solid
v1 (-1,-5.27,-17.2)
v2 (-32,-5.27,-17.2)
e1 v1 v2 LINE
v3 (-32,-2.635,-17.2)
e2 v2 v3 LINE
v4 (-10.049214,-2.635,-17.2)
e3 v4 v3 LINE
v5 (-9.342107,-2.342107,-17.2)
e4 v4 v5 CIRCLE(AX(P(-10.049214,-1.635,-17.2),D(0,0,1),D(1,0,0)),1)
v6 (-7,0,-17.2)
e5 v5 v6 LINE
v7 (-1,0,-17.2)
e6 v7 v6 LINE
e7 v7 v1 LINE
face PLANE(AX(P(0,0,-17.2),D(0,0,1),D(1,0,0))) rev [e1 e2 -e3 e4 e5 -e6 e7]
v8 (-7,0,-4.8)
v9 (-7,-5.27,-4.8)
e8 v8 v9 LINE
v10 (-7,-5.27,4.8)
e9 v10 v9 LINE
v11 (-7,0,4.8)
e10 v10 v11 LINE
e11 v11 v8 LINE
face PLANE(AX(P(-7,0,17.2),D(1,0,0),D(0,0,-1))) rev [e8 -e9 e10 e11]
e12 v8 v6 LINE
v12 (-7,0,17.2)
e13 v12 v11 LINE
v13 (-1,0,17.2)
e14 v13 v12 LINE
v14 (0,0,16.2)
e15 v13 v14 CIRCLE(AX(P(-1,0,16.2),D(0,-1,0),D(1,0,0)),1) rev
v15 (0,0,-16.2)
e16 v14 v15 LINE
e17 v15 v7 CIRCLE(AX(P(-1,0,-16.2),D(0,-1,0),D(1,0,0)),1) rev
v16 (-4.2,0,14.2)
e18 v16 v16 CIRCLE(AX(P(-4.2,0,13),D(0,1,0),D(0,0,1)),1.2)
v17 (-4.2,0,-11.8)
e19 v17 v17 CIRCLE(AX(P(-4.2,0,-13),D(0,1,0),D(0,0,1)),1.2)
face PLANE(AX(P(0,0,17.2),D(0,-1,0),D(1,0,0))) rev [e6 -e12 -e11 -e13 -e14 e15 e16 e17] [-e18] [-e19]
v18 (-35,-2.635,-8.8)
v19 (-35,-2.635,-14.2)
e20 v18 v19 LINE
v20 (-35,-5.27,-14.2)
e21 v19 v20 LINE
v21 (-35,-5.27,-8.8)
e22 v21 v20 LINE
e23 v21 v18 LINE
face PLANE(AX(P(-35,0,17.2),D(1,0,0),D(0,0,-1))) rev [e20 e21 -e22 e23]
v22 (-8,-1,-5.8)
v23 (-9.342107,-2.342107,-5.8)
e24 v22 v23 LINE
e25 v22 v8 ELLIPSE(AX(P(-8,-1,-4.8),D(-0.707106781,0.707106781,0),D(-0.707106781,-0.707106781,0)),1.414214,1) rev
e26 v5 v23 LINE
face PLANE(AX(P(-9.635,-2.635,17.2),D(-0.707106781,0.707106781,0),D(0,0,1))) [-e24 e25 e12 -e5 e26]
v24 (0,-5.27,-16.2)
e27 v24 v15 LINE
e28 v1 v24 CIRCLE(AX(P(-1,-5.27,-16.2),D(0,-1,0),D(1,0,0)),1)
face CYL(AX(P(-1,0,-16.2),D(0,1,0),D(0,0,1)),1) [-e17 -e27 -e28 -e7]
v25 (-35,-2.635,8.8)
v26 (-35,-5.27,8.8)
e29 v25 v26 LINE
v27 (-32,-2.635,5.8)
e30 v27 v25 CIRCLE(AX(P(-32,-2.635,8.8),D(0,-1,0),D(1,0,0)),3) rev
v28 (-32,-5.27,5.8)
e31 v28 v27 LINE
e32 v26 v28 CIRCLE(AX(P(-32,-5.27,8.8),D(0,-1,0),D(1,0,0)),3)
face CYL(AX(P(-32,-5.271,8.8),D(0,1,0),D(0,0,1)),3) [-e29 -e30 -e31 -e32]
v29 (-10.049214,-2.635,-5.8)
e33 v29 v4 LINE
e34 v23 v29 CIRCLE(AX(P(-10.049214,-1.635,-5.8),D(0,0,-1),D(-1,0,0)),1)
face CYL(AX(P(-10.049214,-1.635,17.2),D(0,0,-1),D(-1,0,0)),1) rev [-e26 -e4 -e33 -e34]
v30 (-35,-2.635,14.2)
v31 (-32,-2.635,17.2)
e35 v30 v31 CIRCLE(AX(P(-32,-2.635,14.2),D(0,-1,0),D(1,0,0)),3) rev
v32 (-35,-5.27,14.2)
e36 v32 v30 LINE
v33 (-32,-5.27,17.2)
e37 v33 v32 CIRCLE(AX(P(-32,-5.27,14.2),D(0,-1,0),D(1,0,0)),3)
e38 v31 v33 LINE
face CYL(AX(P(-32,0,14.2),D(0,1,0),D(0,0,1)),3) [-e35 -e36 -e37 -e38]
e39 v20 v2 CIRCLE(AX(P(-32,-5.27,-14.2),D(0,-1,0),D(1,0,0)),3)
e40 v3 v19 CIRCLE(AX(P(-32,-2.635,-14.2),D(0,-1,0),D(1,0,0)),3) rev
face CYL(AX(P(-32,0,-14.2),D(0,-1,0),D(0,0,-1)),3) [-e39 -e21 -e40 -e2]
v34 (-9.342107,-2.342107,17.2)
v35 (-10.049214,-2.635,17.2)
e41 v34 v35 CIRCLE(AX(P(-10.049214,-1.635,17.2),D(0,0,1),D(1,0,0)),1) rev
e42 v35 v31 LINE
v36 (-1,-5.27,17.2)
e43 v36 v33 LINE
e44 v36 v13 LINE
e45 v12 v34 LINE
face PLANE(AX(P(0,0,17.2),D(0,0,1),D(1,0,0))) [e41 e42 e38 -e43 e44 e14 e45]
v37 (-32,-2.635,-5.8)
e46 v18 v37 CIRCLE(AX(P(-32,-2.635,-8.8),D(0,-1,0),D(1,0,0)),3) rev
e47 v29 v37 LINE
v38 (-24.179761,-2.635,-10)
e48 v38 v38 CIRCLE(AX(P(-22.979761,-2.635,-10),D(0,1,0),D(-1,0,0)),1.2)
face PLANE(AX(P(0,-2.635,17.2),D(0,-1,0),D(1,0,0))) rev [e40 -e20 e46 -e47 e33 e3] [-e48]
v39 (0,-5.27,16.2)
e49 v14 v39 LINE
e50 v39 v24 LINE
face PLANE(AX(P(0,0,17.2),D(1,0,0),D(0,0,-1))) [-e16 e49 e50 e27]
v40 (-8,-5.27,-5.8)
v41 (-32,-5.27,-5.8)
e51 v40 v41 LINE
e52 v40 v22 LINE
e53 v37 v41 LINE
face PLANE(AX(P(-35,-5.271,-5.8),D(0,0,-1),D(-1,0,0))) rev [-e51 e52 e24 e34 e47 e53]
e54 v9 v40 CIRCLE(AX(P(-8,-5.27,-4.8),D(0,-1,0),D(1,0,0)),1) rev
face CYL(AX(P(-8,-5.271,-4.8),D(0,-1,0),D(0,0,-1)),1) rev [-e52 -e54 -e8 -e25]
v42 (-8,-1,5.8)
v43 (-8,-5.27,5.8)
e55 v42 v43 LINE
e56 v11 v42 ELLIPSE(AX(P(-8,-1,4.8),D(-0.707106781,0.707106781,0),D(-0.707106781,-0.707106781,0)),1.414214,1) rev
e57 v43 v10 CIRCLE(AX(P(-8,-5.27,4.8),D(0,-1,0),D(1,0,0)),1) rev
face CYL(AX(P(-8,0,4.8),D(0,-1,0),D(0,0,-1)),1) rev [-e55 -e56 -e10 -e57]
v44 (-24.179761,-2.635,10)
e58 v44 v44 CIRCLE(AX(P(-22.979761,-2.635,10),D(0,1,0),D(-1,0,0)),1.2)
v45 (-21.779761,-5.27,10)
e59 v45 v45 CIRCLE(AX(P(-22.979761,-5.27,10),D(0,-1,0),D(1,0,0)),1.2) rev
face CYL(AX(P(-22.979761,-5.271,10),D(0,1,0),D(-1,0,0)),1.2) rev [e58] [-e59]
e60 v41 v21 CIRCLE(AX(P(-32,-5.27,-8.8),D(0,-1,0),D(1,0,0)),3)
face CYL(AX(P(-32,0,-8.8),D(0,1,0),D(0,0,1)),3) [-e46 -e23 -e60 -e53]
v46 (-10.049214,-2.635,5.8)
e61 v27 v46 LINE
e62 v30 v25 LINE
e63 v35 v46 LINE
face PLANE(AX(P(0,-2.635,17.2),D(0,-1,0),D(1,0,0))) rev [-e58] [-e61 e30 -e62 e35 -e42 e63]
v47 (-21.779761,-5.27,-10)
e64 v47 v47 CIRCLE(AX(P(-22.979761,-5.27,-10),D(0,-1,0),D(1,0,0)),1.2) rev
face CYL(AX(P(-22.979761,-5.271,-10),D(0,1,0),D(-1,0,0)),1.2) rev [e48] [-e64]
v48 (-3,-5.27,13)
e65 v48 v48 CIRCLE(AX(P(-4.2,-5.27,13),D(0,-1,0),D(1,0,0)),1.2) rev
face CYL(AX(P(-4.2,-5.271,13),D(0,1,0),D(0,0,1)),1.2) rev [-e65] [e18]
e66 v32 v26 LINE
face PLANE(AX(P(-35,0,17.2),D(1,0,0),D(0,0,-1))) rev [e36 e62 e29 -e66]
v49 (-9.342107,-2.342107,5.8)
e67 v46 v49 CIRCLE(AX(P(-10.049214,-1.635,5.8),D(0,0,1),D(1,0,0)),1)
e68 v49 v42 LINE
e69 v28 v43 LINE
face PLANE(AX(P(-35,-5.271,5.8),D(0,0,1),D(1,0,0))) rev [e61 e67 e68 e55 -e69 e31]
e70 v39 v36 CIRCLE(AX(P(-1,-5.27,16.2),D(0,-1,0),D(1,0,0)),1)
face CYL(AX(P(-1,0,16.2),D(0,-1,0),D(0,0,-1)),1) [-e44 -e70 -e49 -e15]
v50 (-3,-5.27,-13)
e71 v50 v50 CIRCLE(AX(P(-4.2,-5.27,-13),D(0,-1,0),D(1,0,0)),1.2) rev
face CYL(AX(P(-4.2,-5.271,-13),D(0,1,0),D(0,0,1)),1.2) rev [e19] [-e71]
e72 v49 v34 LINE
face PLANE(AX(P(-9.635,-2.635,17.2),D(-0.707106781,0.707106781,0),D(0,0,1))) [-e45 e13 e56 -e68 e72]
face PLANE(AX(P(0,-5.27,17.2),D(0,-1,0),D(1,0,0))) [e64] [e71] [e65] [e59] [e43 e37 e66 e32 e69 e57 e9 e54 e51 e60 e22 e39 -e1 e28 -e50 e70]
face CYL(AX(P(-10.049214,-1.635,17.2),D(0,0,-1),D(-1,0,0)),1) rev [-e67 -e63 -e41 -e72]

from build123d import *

# Parameters (mm, degrees)
SKETCH1_W           = 7
SKETCH1_H           = 2.635
BOSS_EXTRUDE1_DEPTH = 17.2
CUT_EXTRUDE1_REACH  = 41.352
SKETCH2_R           = 1.2
CUT_EXTRUDE2_REACH  = 41.087
SKETCH3_R           = 1.2
SKETCH3_W           = 28
SKETCH3_H           = 11.6
CHAMFER1_SIZE       = 2.635
FILLET2_R           = 1
FILLET3_R           = 3
FILLET4_R           = 1


with BuildPart() as part:
    # Sketch1 → Boss-Extrude1 (new, symmetric)
    with BuildSketch(Plane.XY):
        Polygon((0, -5.27), (0, -2.635), (-7, -2.635), (-35, -2.635), (-35, -5.27), align=None)
        with Locations((-3.5, -1.3175)):
            Rectangle(SKETCH1_W, SKETCH1_H)
    extrude(amount=BOSS_EXTRUDE1_DEPTH, both=True)

    # Sketch2 → Cut-Extrude1 (cut, up to next)
    with BuildSketch(Plane(origin=(0, 0, 0), x_dir=(1, 0, 0), z_dir=(0, 1, 0)), mode=Mode.PRIVATE) as cut_extrude1_sk1:
        with Locations(Location((-4.2, 13, 0), (0, 0, 270))):
            Circle(SKETCH2_R)
    cut_extrude1_tool1 = extrude(cut_extrude1_sk1.sketch, amount=-CUT_EXTRUDE1_REACH, mode=Mode.PRIVATE) & part.part
    # Sketch2 → Cut-Extrude1 (cut, up to next)
    with BuildSketch(Plane(origin=(0, 0, 0), x_dir=(1, 0, 0), z_dir=(0, 1, 0)), mode=Mode.PRIVATE) as cut_extrude1_sk2:
        with Locations(Location((-4.2, -13, 0), (0, 0, 270))):
            Circle(SKETCH2_R)
    cut_extrude1_tool2 = extrude(cut_extrude1_sk2.sketch, amount=-CUT_EXTRUDE1_REACH, mode=Mode.PRIVATE) & part.part
    add(cut_extrude1_tool1.solids().sort_by_distance((-4.2, 0, -13))[0], mode=Mode.SUBTRACT)
    add(cut_extrude1_tool2.solids().sort_by_distance((-4.2, 0, 13))[0], mode=Mode.SUBTRACT)

    # Sketch3 → Cut-Extrude2 (cut, up to next)
    with BuildSketch(Plane(origin=(0, -2.635, 0), x_dir=(1, 0, 0), z_dir=(0, 1, 0)), mode=Mode.PRIVATE) as cut_extrude2_sk1:
        with Locations(Location((-22.979761, 10, 0), (0, 0, 180))):
            Circle(SKETCH3_R)
    cut_extrude2_tool1 = extrude(cut_extrude2_sk1.sketch, amount=-CUT_EXTRUDE2_REACH, mode=Mode.PRIVATE) & part.part
    # Sketch3 → Cut-Extrude2 (cut, up to next)
    with BuildSketch(Plane(origin=(0, -2.635, 0), x_dir=(1, 0, 0), z_dir=(0, 1, 0)), mode=Mode.PRIVATE) as cut_extrude2_sk2:
        with Locations(Location((-22.979761, -10, 0), (0, 0, 180))):
            Circle(SKETCH3_R)
    cut_extrude2_tool2 = extrude(cut_extrude2_sk2.sketch, amount=-CUT_EXTRUDE2_REACH, mode=Mode.PRIVATE) & part.part
    # Sketch3 → Cut-Extrude2 (cut, up to next)
    with BuildSketch(Plane(origin=(0, -2.635, 0), x_dir=(1, 0, 0), z_dir=(0, 1, 0)), mode=Mode.PRIVATE) as cut_extrude2_sk3:
        with Locations((-21, 0)):
            Rectangle(SKETCH3_W, SKETCH3_H)
    cut_extrude2_tool3 = extrude(cut_extrude2_sk3.sketch, amount=-CUT_EXTRUDE2_REACH, mode=Mode.PRIVATE) & part.part
    add(cut_extrude2_tool1.solids().sort_by_distance((-22.979761, -2.635, -10))[0], mode=Mode.SUBTRACT)
    add(cut_extrude2_tool2.solids().sort_by_distance((-22.979761, -2.635, 10))[0], mode=Mode.SUBTRACT)
    add(cut_extrude2_tool3.solids().sort_by_distance((-21, -2.635, 0))[0], mode=Mode.SUBTRACT)

    # Chamfer1
    # the kernel refuses this chamfer: 2.635 mm, written as the material it adds along each edge
    with BuildSketch(Plane(origin=(-7, -2.635, 5.8), x_dir=(0.027495876610586358, 0.9996219169112968, 0), z_dir=(0, 0, 1))) as chamfer1_piece_1_section:
        Polygon((CHAMFER1_SIZE * 0.999621916911, CHAMFER1_SIZE * 0.0274958766106), (-CHAMFER1_SIZE * 0.0274958766106, CHAMFER1_SIZE * 0.999621916911), (0, 0), align=None)
    chamfer1_piece_1 = extrude(amount=11.4, mode=Mode.PRIVATE)
    chamfer1_piece_1 = split(chamfer1_piece_1, bisect_by=Plane(origin=(-7.870614947, 0, 11.5), z_dir=(0, -1, 0)), keep=Keep.TOP, mode=Mode.PRIVATE)
    add(chamfer1_piece_1)
    with BuildSketch(Plane(origin=(-7, -2.635, -17.2), x_dir=(0.027495876610586358, 0.9996219169112968, 0), z_dir=(0, 0, 1))) as chamfer1_piece_2_section:
        Polygon((CHAMFER1_SIZE * 0.999621916911, CHAMFER1_SIZE * 0.0274958766106), (-CHAMFER1_SIZE * 0.0274958766106, CHAMFER1_SIZE * 0.999621916911), (0, 0), align=None)
    chamfer1_piece_2 = extrude(amount=11.4, mode=Mode.PRIVATE)
    chamfer1_piece_2 = split(chamfer1_piece_2, bisect_by=Plane(origin=(-7.870614947, 0, -11.5), z_dir=(0, -1, 0)), keep=Keep.TOP, mode=Mode.PRIVATE)
    add(chamfer1_piece_2)

    # Fillet2
    fillet2_edges = [part.edges().sort_by_distance(p)[0] for p in [
        (-7, -2.635, -5.8),
        (-7, -2.635, 5.8),
        (-9.635, -2.635, 11.5),
        (-9.635, -2.635, -11.5),
    ]]
    fillet(fillet2_edges, radius=FILLET2_R)

    # Fillet3
    fillet3_edges = [part.edges().sort_by_distance(p)[0] for p in [
        (-35, -3.9525, -17.2),
        (-35, -3.9525, 17.2),
        (-35, -3.9525, 5.8),
        (-35, -3.9525, -5.8),
    ]]
    fillet(fillet3_edges, radius=FILLET3_R)

    # Fillet4
    fillet4_edges = [part.edges().sort_by_distance(p)[0] for p in [
        (0, -2.635, 17.2),
        (0, -2.635, -17.2),
    ]]
    fillet(fillet4_edges, radius=FILLET4_R)


solid = part.part
